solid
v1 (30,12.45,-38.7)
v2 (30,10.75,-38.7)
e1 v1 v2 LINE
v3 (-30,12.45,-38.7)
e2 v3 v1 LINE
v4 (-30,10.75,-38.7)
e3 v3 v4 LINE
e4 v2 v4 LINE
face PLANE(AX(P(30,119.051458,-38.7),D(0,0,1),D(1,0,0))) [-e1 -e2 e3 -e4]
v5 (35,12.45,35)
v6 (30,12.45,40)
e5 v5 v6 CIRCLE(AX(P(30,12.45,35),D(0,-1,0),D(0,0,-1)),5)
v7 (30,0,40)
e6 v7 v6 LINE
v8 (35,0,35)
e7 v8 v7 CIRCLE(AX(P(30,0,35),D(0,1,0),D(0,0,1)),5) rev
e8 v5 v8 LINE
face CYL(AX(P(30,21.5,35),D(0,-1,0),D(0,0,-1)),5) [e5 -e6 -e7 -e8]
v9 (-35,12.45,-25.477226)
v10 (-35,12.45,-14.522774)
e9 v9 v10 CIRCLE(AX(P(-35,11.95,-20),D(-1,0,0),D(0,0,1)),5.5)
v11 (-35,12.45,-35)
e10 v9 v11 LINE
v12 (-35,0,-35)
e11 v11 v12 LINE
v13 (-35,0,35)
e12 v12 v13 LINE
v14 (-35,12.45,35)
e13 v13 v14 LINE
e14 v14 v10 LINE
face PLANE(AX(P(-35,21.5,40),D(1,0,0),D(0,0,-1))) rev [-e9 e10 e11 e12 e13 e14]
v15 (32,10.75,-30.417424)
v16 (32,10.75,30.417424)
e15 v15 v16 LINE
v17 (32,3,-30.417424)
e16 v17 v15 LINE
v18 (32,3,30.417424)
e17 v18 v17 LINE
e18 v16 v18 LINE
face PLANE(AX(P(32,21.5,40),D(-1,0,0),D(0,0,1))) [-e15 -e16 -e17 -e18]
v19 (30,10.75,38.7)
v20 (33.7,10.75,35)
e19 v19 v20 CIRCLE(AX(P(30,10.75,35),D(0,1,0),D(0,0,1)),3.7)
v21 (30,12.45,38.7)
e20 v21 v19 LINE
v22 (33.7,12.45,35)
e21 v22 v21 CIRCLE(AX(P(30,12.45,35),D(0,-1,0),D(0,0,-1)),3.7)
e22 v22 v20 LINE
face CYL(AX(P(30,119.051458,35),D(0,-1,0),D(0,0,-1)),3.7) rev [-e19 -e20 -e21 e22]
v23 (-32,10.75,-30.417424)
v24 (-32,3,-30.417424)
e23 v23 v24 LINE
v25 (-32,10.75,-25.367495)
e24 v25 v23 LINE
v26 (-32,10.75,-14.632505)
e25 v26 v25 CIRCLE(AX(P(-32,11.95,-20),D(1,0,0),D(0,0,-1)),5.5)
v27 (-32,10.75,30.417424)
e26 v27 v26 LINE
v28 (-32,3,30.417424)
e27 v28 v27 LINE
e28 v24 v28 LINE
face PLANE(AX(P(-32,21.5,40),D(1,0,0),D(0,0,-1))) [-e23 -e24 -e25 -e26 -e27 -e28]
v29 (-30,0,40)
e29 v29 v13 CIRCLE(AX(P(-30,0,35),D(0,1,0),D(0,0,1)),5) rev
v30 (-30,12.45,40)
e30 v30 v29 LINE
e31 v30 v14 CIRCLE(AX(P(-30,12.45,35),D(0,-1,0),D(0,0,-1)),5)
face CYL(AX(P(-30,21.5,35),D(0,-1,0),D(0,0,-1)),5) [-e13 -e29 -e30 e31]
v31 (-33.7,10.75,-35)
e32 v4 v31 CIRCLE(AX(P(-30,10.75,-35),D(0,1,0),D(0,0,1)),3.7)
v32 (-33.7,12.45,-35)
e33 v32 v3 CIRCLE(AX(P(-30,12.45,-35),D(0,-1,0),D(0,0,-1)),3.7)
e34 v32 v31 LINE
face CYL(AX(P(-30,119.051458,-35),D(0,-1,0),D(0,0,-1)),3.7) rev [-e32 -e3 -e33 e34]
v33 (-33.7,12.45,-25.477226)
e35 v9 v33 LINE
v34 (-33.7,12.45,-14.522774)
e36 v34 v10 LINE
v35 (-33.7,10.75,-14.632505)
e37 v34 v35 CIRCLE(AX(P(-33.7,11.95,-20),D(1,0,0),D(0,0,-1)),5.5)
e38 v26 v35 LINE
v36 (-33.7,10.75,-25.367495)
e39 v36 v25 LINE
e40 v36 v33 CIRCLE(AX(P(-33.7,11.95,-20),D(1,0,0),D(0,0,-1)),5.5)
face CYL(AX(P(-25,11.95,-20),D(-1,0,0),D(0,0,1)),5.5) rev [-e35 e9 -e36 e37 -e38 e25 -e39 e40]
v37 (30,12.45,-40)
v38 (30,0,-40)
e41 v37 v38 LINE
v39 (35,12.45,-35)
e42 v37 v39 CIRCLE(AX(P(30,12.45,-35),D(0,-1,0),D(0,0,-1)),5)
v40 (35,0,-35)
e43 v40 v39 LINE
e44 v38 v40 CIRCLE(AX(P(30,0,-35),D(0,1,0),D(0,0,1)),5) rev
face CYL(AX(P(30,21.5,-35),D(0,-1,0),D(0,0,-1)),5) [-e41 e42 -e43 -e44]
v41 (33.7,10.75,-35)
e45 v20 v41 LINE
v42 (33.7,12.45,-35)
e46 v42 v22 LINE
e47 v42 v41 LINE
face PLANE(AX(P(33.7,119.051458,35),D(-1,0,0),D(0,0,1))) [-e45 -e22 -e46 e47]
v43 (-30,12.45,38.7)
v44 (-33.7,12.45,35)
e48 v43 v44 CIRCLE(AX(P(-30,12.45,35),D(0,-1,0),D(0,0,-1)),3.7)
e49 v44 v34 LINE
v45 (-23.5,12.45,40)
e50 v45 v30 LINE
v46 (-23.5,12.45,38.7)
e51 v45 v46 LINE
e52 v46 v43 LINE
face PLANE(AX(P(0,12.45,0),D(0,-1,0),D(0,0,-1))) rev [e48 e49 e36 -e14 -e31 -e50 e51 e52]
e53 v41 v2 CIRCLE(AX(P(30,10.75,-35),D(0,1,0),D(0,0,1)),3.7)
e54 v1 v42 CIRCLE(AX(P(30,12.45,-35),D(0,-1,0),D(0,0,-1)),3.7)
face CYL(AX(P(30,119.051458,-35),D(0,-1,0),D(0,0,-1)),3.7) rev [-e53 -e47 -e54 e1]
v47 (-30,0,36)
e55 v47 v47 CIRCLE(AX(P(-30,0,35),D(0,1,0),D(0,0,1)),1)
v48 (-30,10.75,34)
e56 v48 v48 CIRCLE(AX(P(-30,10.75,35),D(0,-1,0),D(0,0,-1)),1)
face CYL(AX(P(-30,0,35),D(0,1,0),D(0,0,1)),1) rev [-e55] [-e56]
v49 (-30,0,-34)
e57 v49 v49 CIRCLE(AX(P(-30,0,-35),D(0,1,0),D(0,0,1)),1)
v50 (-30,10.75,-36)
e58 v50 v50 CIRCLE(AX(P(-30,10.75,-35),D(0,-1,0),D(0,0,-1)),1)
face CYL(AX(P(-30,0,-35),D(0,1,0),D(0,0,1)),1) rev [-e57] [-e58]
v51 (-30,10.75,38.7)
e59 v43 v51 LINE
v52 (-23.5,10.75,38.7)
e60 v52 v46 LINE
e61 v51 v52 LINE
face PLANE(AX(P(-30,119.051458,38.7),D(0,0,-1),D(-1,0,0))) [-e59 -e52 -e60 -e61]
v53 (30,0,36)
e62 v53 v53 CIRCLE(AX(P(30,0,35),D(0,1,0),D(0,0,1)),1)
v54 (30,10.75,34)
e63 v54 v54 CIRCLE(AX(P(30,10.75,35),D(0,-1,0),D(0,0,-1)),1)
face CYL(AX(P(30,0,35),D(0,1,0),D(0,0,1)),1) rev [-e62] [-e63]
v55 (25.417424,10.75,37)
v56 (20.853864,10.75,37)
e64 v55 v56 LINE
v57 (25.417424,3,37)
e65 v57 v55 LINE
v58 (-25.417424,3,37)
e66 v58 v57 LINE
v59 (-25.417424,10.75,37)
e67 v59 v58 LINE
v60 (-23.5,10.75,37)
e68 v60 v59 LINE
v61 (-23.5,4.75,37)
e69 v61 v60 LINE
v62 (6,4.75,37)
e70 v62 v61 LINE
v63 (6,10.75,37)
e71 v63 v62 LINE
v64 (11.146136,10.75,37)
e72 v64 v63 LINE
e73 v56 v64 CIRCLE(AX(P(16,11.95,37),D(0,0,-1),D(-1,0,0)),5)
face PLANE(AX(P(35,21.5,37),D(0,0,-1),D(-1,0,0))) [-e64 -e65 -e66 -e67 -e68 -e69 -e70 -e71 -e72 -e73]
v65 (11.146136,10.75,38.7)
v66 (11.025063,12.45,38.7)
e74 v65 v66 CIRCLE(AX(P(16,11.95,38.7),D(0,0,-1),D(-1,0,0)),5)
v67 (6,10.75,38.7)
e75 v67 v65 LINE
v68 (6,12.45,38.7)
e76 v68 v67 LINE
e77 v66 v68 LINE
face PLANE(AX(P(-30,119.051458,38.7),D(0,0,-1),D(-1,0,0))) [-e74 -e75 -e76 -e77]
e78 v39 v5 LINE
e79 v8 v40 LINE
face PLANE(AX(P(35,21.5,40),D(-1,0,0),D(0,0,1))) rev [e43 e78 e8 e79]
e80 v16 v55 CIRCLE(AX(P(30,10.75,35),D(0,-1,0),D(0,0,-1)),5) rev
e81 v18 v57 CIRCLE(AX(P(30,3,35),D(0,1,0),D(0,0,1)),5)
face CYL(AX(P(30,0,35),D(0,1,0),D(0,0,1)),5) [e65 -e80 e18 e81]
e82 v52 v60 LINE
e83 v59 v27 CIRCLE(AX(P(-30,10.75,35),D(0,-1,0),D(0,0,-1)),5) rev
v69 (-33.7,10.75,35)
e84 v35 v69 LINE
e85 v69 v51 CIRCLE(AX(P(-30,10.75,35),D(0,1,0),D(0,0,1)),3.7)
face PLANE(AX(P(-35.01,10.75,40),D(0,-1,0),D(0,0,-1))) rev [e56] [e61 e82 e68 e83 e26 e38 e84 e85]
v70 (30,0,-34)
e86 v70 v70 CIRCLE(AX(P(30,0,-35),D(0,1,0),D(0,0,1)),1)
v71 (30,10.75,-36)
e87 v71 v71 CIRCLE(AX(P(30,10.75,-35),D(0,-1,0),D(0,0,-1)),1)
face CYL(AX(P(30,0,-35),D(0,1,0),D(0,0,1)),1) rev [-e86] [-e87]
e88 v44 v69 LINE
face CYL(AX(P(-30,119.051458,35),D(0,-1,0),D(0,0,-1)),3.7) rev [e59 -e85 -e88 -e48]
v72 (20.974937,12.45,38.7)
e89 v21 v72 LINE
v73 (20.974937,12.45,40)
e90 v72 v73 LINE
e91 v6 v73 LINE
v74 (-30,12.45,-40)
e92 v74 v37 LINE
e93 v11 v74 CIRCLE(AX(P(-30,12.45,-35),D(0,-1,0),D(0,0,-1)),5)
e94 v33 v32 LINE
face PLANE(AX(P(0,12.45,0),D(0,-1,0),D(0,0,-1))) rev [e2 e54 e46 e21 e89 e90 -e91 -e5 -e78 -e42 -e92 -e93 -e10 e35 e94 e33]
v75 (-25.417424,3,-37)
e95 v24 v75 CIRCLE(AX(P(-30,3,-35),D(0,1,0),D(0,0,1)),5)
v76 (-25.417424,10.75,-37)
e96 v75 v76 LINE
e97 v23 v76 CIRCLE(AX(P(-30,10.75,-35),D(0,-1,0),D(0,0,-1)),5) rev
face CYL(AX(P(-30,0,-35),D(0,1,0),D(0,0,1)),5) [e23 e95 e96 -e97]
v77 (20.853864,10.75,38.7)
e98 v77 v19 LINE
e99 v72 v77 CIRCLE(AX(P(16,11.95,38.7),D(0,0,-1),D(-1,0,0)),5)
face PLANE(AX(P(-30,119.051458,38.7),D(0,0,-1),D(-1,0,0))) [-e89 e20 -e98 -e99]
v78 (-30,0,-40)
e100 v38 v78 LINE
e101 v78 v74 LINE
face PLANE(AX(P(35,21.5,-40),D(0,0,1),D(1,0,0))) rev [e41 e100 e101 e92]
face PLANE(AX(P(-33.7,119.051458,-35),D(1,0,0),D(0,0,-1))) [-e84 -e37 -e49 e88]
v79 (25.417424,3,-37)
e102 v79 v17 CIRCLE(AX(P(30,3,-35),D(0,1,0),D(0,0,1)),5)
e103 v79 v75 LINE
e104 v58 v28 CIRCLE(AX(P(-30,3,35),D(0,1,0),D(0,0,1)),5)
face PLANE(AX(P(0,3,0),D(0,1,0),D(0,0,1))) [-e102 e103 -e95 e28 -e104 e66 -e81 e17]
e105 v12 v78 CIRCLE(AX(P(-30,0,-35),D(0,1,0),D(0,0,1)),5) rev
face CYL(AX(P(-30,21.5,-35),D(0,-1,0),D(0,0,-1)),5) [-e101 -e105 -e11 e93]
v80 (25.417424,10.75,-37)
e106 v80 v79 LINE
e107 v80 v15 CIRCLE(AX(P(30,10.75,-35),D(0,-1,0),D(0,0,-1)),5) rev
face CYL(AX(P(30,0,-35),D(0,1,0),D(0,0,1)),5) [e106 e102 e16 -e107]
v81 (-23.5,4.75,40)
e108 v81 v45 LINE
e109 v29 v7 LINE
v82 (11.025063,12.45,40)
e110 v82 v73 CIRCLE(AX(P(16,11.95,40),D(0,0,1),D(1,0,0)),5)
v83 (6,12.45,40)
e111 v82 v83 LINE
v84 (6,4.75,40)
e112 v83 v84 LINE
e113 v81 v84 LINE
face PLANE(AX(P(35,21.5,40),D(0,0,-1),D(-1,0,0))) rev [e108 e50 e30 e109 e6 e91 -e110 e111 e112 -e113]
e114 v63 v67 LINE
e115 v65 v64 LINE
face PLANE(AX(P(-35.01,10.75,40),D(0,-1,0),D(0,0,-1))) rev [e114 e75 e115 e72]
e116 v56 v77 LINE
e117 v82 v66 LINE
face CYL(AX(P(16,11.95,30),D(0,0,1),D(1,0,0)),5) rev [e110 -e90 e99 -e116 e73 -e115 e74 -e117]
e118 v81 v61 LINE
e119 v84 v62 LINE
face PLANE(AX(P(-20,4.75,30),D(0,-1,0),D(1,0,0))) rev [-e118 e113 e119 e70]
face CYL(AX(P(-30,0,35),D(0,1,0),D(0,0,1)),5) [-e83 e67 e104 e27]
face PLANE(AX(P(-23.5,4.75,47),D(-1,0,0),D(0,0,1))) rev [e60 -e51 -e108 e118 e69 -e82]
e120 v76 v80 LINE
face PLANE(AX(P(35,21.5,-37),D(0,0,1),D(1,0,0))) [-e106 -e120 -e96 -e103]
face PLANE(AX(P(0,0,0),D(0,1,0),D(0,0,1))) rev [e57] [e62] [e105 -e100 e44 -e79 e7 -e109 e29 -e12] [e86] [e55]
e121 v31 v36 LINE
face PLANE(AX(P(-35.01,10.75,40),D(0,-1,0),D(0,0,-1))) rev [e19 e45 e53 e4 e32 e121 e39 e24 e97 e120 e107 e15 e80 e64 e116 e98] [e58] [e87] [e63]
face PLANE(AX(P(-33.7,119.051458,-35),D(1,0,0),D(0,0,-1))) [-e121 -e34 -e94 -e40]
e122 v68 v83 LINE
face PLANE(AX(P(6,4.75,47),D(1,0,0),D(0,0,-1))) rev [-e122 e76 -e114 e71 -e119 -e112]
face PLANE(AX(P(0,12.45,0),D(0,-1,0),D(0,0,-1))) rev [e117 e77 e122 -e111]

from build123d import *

# Parameters (mm, degrees)
SKETCH1_W               = 70
SKETCH1_H               = 80
BOSS_EXTRUDE1_DEPTH     = 21.5
FILLET1_R               = 5
SHELL1_T                = 3
BOSS_EXTRUDE2_REACH     = 59.335
SKETCH3_R               = 5
SPLIT2_SURFACE_1_BACK   = 109.454
SPLIT2_SURFACE_1_DEPTH  = 218.908
SPLIT2_SURFACE_2_BACK   = 109.454
SPLIT2_SURFACE_2_DEPTH  = 218.908
SKETCH4_R               = 1
CUT_EXTRUDE1_DEPTH      = 58.334544561
SKETCH5_R               = 3
CUT_EXTRUDE2_DEPTH      = 7.75
SKETCH6_OUTSIDE_W       = 93.69
SKETCH6_OUTSIDE_H       = 103.69
CUT_EXTRUDE3_DEPTH      = 2
BOSS_EXTRUDE3_START     = 1.7
BOSS_EXTRUDE3_DEPTH     = 1.7
SKETCH8_R               = 5.5
CUT_EXTRUDE4_DEPTH      = 10
SKETCH9_R               = 5
SKETCH9_W               = 20
SKETCH9_H               = 12
CUT_EXTRUDE5_DEPTH      = 10
BOSS_EXTRUDE4_OUTLINE_W = 20
BOSS_EXTRUDE4_OUTLINE_H = 1.5
BOSS_EXTRUDE4_DEPTH     = 7.75
SKETCH12_W              = 29.5
SKETCH12_H              = 12
CUT_EXTRUDE6_DEPTH      = 10
BOSS_EXTRUDE5_DEPTH     = 5


# Read off the part's stored shape, not the designer's step: Boss-Extrude4
with BuildPart() as part:
    # Sketch1 → Boss-Extrude1 (new body)
    with BuildSketch(Plane(origin=(0, 0, 0), x_dir=(1, 0, 0), z_dir=(0, 1, 0))):
        Rectangle(SKETCH1_W, SKETCH1_H)
    extrude(amount=BOSS_EXTRUDE1_DEPTH)

    # Fillet1
    fillet1_edges = [part.edges().sort_by_distance(p)[0] for p in [
        (-35, 10.75, -40),
        (35, 10.75, -40),
        (35, 10.75, 40),
        (-35, 10.75, 40),
    ]]
    fillet(fillet1_edges, radius=FILLET1_R)

    # Shell1 (no face opened: a closed hollow body)
    add(offset(amount=-SHELL1_T, mode=Mode.PRIVATE), mode=Mode.SUBTRACT)

    # Sketch3 → Boss-Extrude2 (add, up to next)
    with BuildSketch(Plane(origin=(0, 21.5, 0), x_dir=(1, 0, 0), z_dir=(0, 1, 0)), mode=Mode.PRIVATE) as boss_extrude2_sk1:
        with Locations((-30, 35)):
            Circle(SKETCH3_R)
    boss_extrude2_tool1 = extrude(boss_extrude2_sk1.sketch, amount=-BOSS_EXTRUDE2_REACH, mode=Mode.PRIVATE) - part.part
    # Sketch3 → Boss-Extrude2 (add, up to next)
    with BuildSketch(Plane(origin=(0, 21.5, 0), x_dir=(1, 0, 0), z_dir=(0, 1, 0)), mode=Mode.PRIVATE) as boss_extrude2_sk2:
        with Locations((30, 35)):
            Circle(SKETCH3_R)
    boss_extrude2_tool2 = extrude(boss_extrude2_sk2.sketch, amount=-BOSS_EXTRUDE2_REACH, mode=Mode.PRIVATE) - part.part
    # Sketch3 → Boss-Extrude2 (add, up to next)
    with BuildSketch(Plane(origin=(0, 21.5, 0), x_dir=(1, 0, 0), z_dir=(0, 1, 0)), mode=Mode.PRIVATE) as boss_extrude2_sk3:
        with Locations((30, -35)):
            Circle(SKETCH3_R)
    boss_extrude2_tool3 = extrude(boss_extrude2_sk3.sketch, amount=-BOSS_EXTRUDE2_REACH, mode=Mode.PRIVATE) - part.part
    # Sketch3 → Boss-Extrude2 (add, up to next)
    with BuildSketch(Plane(origin=(0, 21.5, 0), x_dir=(1, 0, 0), z_dir=(0, 1, 0)), mode=Mode.PRIVATE) as boss_extrude2_sk4:
        with Locations((-30, -35)):
            Circle(SKETCH3_R)
    boss_extrude2_tool4 = extrude(boss_extrude2_sk4.sketch, amount=-BOSS_EXTRUDE2_REACH, mode=Mode.PRIVATE) - part.part
    add(boss_extrude2_tool1.solids().sort_by_distance((-30, 21.5, -35))[0])
    add(boss_extrude2_tool2.solids().sort_by_distance((30, 21.5, -35))[0])
    add(boss_extrude2_tool3.solids().sort_by_distance((30, 21.5, 35))[0])
    add(boss_extrude2_tool4.solids().sort_by_distance((-30, 21.5, 35))[0])


with BuildPart() as body_2:
    # Split2: the piece behind the surface
    add(part.part)
    # Split2 surface: a surface, the sketch's curves swept straight by 218.908 mm
    with BuildLine(Plane(origin=(0, 0, 0), x_dir=(0, 0, -1), z_dir=(1, 0, 0)).offset(-SPLIT2_SURFACE_1_BACK), mode=Mode.PRIVATE) as split2_surface_1_path:
        Line((-40, 10.75), (51.562362236, 10.75))
    split2_surface_1 = Shell.extrude(split2_surface_1_path.wire(), (1 * SPLIT2_SURFACE_1_DEPTH, 0 * SPLIT2_SURFACE_1_DEPTH, 0 * SPLIT2_SURFACE_1_DEPTH))
    split(bisect_by=split2_surface_1, keep=Keep.BOTTOM)


with BuildPart() as part_1:
    add(part.part)

    # Split2: split by a surface, the side it looks to stays
    # Split2 surface: a surface, the sketch's curves swept straight by 218.908 mm
    with BuildLine(Plane(origin=(0, 0, 0), x_dir=(0, 0, -1), z_dir=(1, 0, 0)).offset(-SPLIT2_SURFACE_2_BACK), mode=Mode.PRIVATE) as split2_surface_2_path:
        Line((-40, 10.75), (51.562362236, 10.75))
    split2_surface_2 = Shell.extrude(split2_surface_2_path.wire(), (1 * SPLIT2_SURFACE_2_DEPTH, 0 * SPLIT2_SURFACE_2_DEPTH, 0 * SPLIT2_SURFACE_2_DEPTH))
    split(bisect_by=split2_surface_2, keep=Keep.TOP)


with BuildPart() as cut_extrude1_tool:
    # Sketch4 → Cut-Extrude1 (new, through all)
    with BuildSketch(Plane(origin=(0, 21.5, 0), x_dir=(1, 0, 0), z_dir=(0, 1, 0))):
        with Locations(Location((-30, 35, 0), (0, 0, 270))):
            Circle(SKETCH4_R)
        with Locations(Location((30, 35, 0), (0, 0, 270))):
            Circle(SKETCH4_R)
        with Locations(Location((30, -35, 0), (0, 0, 270))):
            Circle(SKETCH4_R)
        with Locations(Location((-30, -35, 0), (0, 0, 270))):
            Circle(SKETCH4_R)
    extrude(amount=-CUT_EXTRUDE1_DEPTH)


with BuildPart() as part_2:
    add(part_1.part)

    # Cut-Extrude1: cut by cut_extrude1_tool
    add(cut_extrude1_tool.part, mode=Mode.SUBTRACT)

    # Sketch5 → Cut-Extrude2 (cut)
    with BuildSketch(Plane(origin=(0, 21.5, 0), x_dir=(1, 0, 0), z_dir=(0, 1, 0))):
        with Locations(Location((-30, 35, 0), (0, 0, 270))):
            Circle(SKETCH5_R)
        with Locations(Location((30, 35, 0), (0, 0, 270))):
            Circle(SKETCH5_R)
        with Locations(Location((30, -35, 0), (0, 0, 270))):
            Circle(SKETCH5_R)
        with Locations(Location((-30, -35, 0), (0, 0, 270))):
            Circle(SKETCH5_R)
    extrude(amount=-CUT_EXTRUDE2_DEPTH, mode=Mode.SUBTRACT)

    # Sketch6 outside → Cut-Extrude3 (cut)
    with BuildSketch(Plane.XZ.offset(-10.75)):
        Rectangle(SKETCH6_OUTSIDE_W, SKETCH6_OUTSIDE_H)
        with BuildLine():
            Line((-30, -38.5), (30, -38.5))
            ThreePointArc((30, -38.5), (32.474873734, -37.474873734), (33.5, -35))
            Line((33.5, -35), (33.5, 35))
            ThreePointArc((33.5, 35), (32.474873734, 37.474873734), (30, 38.5))
            Line((30, 38.5), (-30, 38.5))
            ThreePointArc((-30, 38.5), (-32.474873734, 37.474873734), (-33.5, 35))
            Line((-33.5, 35), (-33.5, -35))
            ThreePointArc((-33.5, -35), (-32.474873734, -37.474873734), (-30, -38.5))
        make_face(mode=Mode.SUBTRACT)
    extrude(amount=-CUT_EXTRUDE3_DEPTH, mode=Mode.SUBTRACT)


with BuildPart() as body_2_1:
    add(body_2.part)

    # Cut-Extrude1: cut by cut_extrude1_tool
    add(cut_extrude1_tool.part, mode=Mode.SUBTRACT)

    # Sketch7 → Boss-Extrude3 (add)
    with BuildSketch(Plane(origin=(0, 10.75, 0), x_dir=(1, 0, 0), z_dir=(0, 1, 0)).offset(BOSS_EXTRUDE3_START)):
        with BuildLine():
            Line((-30, 40), (30, 40))
            ThreePointArc((30, 40), (33.535533906, 38.535533906), (35, 35))
            Line((35, 35), (35, -35))
            ThreePointArc((35, -35), (33.535533906, -38.535533906), (30, -40))
            Line((30, -40), (-30, -40))
            ThreePointArc((-30, -40), (-33.535533906, -38.535533906), (-35, -35))
            Line((-35, -35), (-35, 35))
            ThreePointArc((-35, 35), (-33.535533906, 38.535533906), (-30, 40))
        make_face()
        with BuildLine():
            Line((30, 38.7), (-30, 38.7))
            ThreePointArc((-30, 38.7), (-32.61629509, 37.61629509), (-33.7, 35))
            Line((-33.7, 35), (-33.7, -35))
            ThreePointArc((-33.7, -35), (-32.61629509, -37.61629509), (-30, -38.7))
            Line((-30, -38.7), (30, -38.7))
            ThreePointArc((30, -38.7), (32.61629509, -37.61629509), (33.7, -35))
            Line((33.7, -35), (33.7, 35))
            ThreePointArc((33.7, 35), (32.61629509, 37.61629509), (30, 38.7))
        make_face(mode=Mode.SUBTRACT)
    extrude(amount=-BOSS_EXTRUDE3_DEPTH)


with BuildPart() as cut_extrude4_tool:
    # Sketch8 → Cut-Extrude4 (new body)
    with BuildSketch(Plane.ZY.offset(35)):
        with Locations((-20, 11.95)):
            Circle(SKETCH8_R)
    extrude(amount=-CUT_EXTRUDE4_DEPTH)


with BuildPart() as part_3:
    add(part_2.part)

    # Cut-Extrude4: cut by cut_extrude4_tool
    add(cut_extrude4_tool.part, mode=Mode.SUBTRACT)


with BuildPart() as body_2_2:
    add(body_2_1.part)

    # Cut-Extrude4: cut by cut_extrude4_tool
    add(cut_extrude4_tool.part, mode=Mode.SUBTRACT)


with BuildPart() as cut_extrude5_tool:
    # Sketch9 → Cut-Extrude5 (new body)
    with BuildSketch(Plane.XY.offset(40)):
        with Locations((16, 11.95)):
            Circle(SKETCH9_R)
        with Locations((-10, 10.75)):
            Rectangle(SKETCH9_W, SKETCH9_H)
    extrude(amount=-CUT_EXTRUDE5_DEPTH)


with BuildPart() as part_4:
    add(part_3.part)

    # Cut-Extrude5: cut by cut_extrude5_tool
    add(cut_extrude5_tool.part, mode=Mode.SUBTRACT)

    # Boss-Extrude4 outline → Boss-Extrude4 (add)
    with BuildSketch(Plane.XZ.offset(-18.5)):
        Polygon((10.5, 37), (7.5, 37), (7.5, 35), (6, 35), (6, 32), (10.5, 32), align=None)
        with Locations((-10, 37.75)):
            Rectangle(BOSS_EXTRUDE4_OUTLINE_W, BOSS_EXTRUDE4_OUTLINE_H)
        with BuildLine():
            Line((-23.5, 35), (-25, 35))
            ThreePointArc((-25, 35), (-25.25658351, 33.41886117), (-26, 32))
            Line((-26, 32), (-23.5, 32))
            Line((-23.5, 32), (-23.5, 35))
        make_face()
        with BuildLine():
            Line((-25, 35), (-25, 37))
            Line((-25, 37), (-25.417424305, 37))
            ThreePointArc((-25.417424305, 37), (-25.105468435, 36.021548218), (-25, 35))
        make_face()
        with BuildLine():
            Line((-28, 37.236067977), (-28, 32.763932023))
            ThreePointArc((-28, 32.763932023), (-27, 35), (-28, 37.236067977))
        make_face()
    extrude(amount=BOSS_EXTRUDE4_DEPTH)


with BuildPart() as body_2_3:
    add(body_2_2.part)

    # Cut-Extrude5: cut by cut_extrude5_tool
    add(cut_extrude5_tool.part, mode=Mode.SUBTRACT)


with BuildPart() as cut_extrude6_tool:
    # Sketch12 → Cut-Extrude6 (new body)
    with BuildSketch(Plane(origin=(0, 0, 37), x_dir=(-1, 0, 0), z_dir=(0, 0, -1))):
        with Locations((8.75, 10.75)):
            Rectangle(SKETCH12_W, SKETCH12_H)
    extrude(amount=-CUT_EXTRUDE6_DEPTH)


with BuildPart() as part_5:
    add(part_4.part)

    # Cut-Extrude6: cut by cut_extrude6_tool
    add(cut_extrude6_tool.part, mode=Mode.SUBTRACT)

    # Sketch14 → Boss-Extrude5 (add)
    with BuildSketch(Plane.XZ.offset(-10.75)):
        Polygon((10.5, 36.8), (7.5, 36.8), (7.5, 35), (6, 35), (6, 32), (10.5, 32), align=None)
    extrude(amount=BOSS_EXTRUDE5_DEPTH)


with BuildPart() as body_2_4:
    add(body_2_3.part)

    # Cut-Extrude6: cut by cut_extrude6_tool
    add(cut_extrude6_tool.part, mode=Mode.SUBTRACT)


solid = body_2_4.part
